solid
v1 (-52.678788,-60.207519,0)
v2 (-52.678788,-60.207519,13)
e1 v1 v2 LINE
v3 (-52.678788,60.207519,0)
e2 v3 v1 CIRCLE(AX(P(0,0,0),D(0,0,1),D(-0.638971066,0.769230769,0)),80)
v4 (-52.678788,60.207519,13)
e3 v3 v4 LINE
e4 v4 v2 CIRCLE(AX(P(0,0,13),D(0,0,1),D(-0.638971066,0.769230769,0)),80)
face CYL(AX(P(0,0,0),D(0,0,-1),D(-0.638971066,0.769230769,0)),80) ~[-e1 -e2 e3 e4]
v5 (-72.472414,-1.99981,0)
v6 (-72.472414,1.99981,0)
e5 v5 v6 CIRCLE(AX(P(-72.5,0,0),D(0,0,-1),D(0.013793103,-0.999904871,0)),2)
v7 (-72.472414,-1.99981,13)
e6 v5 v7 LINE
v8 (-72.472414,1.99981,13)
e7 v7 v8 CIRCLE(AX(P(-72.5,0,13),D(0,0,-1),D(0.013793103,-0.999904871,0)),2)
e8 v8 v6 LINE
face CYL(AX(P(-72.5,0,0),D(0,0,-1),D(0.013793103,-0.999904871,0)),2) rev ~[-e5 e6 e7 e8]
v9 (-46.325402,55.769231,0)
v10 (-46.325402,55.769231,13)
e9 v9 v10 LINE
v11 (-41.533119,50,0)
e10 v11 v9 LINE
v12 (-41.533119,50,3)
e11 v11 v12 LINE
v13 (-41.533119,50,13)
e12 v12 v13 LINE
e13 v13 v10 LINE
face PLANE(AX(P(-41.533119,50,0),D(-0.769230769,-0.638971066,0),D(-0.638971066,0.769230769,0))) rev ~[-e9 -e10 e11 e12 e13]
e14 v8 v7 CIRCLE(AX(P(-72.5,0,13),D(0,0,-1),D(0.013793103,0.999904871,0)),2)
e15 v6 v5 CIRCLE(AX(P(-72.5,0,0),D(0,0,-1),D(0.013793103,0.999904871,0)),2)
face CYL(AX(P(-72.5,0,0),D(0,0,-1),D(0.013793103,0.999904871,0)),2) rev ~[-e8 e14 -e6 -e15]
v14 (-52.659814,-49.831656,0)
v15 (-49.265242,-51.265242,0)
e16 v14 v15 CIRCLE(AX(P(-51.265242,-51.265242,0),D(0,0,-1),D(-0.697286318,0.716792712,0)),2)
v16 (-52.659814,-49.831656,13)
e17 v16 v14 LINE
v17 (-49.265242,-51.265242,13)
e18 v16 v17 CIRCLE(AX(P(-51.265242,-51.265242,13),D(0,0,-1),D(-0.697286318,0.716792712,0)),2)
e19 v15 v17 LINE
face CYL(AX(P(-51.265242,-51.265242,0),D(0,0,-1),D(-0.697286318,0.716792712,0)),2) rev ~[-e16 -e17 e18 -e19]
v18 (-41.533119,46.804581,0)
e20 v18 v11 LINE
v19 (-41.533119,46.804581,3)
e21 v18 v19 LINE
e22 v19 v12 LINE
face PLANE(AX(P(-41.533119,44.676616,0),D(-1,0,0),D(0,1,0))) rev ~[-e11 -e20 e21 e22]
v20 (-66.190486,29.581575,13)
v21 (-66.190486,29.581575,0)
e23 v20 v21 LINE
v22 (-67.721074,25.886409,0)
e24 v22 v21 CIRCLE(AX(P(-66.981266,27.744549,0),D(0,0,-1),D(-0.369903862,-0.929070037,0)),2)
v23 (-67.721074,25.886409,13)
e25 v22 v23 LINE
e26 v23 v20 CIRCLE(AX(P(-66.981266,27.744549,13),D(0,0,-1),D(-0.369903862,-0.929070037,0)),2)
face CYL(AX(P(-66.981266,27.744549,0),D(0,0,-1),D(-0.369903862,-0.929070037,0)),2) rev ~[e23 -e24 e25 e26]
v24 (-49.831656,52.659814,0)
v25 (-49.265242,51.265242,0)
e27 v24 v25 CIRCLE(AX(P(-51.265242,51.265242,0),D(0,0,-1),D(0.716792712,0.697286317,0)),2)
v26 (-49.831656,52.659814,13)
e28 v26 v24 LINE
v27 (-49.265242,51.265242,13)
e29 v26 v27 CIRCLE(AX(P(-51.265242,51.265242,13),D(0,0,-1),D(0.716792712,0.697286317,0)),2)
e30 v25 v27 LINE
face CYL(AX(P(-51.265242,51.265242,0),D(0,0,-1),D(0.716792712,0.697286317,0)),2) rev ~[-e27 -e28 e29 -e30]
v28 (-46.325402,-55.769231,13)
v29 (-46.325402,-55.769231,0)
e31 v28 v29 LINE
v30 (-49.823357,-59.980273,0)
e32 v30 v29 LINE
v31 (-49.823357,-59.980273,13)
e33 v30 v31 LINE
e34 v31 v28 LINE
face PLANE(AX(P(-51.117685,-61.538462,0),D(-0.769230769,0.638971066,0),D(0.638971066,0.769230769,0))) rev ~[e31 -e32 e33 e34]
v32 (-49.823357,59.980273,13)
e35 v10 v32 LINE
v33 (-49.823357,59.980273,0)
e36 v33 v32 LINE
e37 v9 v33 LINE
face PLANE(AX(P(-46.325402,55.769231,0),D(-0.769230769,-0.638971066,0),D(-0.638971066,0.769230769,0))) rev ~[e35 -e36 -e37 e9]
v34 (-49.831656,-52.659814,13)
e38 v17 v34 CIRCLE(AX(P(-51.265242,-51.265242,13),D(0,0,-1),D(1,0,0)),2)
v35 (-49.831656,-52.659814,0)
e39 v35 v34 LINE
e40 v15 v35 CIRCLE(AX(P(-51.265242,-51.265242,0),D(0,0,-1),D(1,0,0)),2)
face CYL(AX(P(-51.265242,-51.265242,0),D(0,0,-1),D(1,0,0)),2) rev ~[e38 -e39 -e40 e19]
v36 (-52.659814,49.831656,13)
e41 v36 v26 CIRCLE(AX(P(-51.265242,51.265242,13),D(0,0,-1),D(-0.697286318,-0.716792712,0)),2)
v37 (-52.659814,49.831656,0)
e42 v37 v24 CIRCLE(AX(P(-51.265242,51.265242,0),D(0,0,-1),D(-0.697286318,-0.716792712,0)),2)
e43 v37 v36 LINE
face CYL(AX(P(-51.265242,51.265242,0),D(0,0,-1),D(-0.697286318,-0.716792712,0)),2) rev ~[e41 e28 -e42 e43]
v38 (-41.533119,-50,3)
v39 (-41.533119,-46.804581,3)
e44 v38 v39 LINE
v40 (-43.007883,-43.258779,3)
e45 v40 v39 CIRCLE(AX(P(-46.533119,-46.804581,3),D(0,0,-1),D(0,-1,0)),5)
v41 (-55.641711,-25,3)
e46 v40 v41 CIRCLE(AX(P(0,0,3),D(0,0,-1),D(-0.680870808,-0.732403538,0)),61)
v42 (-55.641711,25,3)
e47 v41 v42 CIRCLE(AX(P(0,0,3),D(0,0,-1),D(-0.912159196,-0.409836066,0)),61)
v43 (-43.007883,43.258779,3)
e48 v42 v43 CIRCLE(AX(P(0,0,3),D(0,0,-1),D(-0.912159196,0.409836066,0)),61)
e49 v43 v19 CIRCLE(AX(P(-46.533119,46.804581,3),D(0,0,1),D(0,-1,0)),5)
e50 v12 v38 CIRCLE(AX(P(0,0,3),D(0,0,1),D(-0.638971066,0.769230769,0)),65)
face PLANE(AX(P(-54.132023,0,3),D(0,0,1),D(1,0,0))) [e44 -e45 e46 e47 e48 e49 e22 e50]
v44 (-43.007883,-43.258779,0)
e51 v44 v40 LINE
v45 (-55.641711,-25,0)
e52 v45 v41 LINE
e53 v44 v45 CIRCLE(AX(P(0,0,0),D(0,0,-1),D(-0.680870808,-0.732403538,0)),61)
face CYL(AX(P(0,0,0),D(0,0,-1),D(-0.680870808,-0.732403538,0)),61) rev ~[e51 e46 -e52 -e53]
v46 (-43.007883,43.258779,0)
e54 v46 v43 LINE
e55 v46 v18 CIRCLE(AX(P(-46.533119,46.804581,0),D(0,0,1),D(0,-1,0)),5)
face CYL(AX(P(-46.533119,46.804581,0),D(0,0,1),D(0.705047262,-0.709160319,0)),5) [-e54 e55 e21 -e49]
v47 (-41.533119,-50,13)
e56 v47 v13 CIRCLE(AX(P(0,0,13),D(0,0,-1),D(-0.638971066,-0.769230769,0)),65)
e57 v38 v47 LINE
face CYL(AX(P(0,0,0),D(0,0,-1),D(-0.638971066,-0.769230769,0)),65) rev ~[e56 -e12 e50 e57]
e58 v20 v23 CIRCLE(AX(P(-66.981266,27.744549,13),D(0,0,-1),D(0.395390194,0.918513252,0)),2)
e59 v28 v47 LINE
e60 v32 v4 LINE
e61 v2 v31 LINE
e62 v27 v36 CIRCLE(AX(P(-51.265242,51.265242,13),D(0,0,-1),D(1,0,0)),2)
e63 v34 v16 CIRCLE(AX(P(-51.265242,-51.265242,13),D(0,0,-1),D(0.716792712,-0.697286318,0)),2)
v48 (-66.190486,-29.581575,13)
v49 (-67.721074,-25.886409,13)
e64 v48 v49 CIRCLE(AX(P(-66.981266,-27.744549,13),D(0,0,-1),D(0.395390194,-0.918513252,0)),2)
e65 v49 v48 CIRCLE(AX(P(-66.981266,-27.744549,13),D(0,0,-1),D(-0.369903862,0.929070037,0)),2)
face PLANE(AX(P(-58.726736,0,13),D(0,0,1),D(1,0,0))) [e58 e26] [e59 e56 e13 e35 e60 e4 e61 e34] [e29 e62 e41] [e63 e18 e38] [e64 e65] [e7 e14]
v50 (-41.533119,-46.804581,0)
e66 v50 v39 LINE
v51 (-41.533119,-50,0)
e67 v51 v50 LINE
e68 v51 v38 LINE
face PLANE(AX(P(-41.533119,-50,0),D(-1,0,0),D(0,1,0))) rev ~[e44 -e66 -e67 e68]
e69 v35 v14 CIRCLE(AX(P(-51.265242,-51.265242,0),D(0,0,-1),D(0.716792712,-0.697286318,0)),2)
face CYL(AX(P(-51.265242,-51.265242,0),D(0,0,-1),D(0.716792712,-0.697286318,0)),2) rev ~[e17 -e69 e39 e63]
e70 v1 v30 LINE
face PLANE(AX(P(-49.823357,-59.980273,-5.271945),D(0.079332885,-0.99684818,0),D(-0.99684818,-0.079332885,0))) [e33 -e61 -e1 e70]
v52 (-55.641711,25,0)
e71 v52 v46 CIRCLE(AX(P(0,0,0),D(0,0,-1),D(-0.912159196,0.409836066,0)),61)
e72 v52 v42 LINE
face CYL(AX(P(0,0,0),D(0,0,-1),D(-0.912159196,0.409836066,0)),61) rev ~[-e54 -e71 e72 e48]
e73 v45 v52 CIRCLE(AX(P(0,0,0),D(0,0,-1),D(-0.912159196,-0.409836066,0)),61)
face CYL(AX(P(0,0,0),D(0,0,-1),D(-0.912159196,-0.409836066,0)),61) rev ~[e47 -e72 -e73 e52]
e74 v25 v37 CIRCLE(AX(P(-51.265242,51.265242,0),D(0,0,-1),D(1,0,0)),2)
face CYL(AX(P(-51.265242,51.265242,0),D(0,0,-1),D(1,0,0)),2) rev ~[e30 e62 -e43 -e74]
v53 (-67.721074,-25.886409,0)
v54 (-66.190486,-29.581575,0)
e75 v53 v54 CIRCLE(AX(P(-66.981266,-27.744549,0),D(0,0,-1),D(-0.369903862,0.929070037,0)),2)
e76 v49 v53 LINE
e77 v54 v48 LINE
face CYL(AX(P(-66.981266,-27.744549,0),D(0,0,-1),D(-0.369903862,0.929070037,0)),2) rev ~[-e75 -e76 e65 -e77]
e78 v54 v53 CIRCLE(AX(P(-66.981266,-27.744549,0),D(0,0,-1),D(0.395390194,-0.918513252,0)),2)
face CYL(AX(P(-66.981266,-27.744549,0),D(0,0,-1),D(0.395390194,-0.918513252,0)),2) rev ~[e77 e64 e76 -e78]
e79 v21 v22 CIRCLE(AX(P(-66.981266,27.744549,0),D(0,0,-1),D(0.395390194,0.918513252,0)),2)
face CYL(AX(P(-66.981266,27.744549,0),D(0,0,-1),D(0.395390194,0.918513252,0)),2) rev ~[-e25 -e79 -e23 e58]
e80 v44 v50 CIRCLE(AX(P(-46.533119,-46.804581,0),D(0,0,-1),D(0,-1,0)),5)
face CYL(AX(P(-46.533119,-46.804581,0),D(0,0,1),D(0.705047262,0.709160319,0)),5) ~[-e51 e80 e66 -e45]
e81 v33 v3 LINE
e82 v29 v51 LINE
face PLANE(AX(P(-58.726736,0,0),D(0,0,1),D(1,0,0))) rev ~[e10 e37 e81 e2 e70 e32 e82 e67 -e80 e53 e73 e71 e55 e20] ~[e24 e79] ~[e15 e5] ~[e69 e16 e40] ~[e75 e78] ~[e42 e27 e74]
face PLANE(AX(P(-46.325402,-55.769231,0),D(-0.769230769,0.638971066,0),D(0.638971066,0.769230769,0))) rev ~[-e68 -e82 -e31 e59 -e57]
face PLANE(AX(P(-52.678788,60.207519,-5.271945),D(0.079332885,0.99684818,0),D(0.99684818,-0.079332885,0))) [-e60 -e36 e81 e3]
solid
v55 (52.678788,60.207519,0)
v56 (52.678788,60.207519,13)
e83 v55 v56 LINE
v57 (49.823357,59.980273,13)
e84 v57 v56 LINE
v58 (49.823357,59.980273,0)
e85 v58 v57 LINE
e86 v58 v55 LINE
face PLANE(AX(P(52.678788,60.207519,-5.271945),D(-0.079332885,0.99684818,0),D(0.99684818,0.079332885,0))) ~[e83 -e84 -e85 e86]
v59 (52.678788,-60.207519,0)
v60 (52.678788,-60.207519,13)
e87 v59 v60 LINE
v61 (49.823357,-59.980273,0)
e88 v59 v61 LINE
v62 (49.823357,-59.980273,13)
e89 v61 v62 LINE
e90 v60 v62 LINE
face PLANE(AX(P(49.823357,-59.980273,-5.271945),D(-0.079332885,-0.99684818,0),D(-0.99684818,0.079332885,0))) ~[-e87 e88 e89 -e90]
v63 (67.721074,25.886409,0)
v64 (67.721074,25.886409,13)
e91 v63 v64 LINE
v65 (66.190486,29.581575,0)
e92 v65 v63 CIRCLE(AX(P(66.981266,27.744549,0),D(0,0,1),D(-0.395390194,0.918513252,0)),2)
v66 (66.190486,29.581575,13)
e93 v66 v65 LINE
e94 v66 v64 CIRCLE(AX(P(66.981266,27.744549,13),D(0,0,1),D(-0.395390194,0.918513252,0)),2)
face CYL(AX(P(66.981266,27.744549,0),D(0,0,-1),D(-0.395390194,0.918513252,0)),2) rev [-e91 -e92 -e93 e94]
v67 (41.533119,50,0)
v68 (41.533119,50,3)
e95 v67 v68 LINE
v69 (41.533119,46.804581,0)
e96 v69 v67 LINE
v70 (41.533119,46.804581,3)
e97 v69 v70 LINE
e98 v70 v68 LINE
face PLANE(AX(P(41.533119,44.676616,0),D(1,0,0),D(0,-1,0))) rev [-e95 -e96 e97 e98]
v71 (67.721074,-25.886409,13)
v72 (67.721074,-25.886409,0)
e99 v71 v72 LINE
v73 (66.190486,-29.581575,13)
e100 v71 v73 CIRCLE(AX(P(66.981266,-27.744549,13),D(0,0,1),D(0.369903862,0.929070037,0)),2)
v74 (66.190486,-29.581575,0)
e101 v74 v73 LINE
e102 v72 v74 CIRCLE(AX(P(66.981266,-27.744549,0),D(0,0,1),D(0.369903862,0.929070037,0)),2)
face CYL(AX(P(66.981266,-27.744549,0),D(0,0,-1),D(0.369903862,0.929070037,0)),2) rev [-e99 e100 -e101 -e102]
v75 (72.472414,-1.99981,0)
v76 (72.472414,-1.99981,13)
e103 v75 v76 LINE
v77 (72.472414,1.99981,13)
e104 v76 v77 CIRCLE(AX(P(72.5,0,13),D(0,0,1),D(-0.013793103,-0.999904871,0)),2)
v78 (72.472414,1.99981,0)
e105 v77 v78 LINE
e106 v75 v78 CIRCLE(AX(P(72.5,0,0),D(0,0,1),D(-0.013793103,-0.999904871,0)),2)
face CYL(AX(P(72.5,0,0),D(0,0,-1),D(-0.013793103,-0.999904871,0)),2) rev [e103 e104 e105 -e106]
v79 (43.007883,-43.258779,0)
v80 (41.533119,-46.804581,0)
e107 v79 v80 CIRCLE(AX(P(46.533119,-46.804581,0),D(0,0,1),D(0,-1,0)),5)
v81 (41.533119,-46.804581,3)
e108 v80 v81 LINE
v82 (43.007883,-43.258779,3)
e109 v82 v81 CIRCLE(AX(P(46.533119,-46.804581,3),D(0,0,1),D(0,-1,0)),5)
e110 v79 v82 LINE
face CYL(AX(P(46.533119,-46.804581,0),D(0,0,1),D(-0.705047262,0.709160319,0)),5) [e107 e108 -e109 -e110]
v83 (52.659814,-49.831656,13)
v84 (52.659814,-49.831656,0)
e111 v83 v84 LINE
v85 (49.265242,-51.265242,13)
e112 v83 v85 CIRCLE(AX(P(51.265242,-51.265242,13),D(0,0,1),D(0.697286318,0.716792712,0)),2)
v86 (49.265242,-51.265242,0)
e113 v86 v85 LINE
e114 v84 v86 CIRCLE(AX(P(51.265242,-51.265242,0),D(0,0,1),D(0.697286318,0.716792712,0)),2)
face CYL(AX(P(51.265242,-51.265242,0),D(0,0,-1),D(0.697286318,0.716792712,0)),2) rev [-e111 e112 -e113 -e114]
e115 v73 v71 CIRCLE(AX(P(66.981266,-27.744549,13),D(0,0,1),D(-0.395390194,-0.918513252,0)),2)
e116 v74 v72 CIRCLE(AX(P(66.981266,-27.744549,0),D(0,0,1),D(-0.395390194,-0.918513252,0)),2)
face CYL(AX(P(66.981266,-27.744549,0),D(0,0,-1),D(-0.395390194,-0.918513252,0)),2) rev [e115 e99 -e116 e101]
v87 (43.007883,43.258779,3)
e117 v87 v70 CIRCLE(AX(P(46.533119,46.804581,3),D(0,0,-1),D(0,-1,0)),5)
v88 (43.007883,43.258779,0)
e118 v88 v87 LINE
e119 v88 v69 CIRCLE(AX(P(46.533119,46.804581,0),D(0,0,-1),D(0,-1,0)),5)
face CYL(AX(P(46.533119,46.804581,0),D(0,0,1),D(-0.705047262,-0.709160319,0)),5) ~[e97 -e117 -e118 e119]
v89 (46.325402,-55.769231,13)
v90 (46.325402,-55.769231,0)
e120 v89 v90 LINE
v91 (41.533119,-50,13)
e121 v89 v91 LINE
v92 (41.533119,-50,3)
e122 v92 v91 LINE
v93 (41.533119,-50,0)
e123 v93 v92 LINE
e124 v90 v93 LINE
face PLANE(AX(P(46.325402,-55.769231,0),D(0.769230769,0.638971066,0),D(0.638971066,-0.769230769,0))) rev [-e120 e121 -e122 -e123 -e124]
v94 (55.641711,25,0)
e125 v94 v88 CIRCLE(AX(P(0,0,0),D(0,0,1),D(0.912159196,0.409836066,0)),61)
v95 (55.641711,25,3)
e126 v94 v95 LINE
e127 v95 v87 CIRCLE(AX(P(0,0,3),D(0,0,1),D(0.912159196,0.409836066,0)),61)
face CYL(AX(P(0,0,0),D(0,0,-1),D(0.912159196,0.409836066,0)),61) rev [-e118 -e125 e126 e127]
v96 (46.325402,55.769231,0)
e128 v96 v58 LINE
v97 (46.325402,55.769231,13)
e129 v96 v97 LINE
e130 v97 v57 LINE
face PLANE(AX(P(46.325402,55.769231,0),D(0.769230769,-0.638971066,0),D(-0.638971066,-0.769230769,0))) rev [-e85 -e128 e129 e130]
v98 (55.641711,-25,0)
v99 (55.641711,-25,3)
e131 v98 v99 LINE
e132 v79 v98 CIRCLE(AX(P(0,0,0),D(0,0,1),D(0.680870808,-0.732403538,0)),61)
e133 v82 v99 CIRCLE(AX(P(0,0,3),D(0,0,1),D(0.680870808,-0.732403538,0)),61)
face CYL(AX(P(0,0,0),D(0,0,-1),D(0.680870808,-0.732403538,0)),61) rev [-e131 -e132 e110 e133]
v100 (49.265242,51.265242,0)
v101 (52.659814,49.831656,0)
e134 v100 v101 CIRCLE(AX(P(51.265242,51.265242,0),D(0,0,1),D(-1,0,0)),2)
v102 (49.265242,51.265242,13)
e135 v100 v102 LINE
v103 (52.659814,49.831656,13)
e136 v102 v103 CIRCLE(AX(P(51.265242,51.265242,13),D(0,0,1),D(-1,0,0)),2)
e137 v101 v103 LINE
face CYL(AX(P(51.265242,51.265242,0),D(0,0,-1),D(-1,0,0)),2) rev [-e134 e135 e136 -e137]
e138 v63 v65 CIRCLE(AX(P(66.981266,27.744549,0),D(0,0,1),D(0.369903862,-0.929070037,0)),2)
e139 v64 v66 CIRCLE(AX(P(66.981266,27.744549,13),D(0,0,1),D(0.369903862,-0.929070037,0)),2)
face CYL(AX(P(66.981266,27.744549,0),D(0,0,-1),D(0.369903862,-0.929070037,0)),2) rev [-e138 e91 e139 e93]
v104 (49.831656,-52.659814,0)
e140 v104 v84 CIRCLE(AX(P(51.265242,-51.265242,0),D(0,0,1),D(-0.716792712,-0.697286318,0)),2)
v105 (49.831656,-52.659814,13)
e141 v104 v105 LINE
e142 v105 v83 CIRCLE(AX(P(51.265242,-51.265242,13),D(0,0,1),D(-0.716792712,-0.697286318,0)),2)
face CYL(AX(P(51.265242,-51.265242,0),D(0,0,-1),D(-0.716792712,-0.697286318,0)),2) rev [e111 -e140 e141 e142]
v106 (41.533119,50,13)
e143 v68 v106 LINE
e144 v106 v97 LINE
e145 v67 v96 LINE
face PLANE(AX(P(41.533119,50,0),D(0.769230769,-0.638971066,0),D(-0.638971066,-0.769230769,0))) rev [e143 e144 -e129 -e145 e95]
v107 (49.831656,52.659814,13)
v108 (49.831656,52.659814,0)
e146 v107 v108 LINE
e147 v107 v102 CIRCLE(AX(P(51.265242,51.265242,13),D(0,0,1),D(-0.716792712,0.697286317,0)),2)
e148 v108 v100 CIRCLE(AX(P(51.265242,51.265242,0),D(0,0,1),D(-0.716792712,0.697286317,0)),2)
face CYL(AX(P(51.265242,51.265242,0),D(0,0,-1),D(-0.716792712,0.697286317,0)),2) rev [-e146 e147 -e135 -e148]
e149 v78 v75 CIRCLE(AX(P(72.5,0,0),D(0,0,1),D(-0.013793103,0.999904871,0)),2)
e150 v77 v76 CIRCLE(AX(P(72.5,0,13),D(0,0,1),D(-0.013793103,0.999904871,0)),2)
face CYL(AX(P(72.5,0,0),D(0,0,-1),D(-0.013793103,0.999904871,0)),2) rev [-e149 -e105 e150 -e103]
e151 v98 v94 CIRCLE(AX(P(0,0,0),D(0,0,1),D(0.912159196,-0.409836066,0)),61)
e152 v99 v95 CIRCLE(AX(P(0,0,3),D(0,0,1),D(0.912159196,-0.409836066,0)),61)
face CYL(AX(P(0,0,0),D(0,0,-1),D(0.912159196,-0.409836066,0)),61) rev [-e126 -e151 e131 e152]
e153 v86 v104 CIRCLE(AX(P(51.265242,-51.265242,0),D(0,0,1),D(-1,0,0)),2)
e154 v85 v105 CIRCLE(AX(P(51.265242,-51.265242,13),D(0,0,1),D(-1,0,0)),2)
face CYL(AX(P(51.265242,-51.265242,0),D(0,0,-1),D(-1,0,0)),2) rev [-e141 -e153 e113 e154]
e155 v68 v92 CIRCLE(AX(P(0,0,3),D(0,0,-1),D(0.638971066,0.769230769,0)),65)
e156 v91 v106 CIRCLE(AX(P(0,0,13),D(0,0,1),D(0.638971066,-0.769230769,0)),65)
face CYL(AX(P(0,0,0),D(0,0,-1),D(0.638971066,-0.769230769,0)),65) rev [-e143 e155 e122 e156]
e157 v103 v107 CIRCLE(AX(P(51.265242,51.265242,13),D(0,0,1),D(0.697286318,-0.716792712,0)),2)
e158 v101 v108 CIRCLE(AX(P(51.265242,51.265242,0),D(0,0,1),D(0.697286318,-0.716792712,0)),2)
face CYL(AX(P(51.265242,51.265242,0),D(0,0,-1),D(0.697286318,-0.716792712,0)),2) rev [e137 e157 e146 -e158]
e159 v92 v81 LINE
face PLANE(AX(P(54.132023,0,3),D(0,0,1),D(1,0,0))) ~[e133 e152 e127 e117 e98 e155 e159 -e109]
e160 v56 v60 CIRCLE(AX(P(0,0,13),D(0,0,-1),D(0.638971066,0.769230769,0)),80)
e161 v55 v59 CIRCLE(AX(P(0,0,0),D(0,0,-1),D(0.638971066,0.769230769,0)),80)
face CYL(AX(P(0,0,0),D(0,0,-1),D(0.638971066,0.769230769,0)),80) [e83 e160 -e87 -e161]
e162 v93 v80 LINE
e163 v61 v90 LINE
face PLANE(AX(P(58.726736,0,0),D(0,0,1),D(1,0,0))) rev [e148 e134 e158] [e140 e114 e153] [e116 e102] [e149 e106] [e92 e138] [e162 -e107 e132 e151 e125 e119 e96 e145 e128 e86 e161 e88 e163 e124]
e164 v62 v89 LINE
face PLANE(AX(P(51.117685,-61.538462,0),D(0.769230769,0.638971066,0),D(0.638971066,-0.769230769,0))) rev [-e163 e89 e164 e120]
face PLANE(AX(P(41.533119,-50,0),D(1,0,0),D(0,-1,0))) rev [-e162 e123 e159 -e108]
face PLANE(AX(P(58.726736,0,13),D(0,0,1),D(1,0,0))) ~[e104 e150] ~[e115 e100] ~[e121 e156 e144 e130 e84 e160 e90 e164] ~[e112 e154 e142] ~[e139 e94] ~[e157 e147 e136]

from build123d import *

# Parameters (mm, degrees)
F1_DEPTH    = 3
F2_DEPTH    = 13
F3_R        = 5
F4_T1_DEPTH = 23.5438904605


# Not quite as in the source:
# - a fillet or chamfer that OpenCascade refuses, or shapes differently, is made with other operations: its cross-section is extruded or revolved along the edge and cut away or added


with BuildPart() as f1:
    # F0 (on Top) → F1 (new body)
    with BuildSketch(Plane.XY):
        with BuildLine():
            ThreePointArc((-55.641710973, -25), (-61, 0), (-55.641710973, 25))
            ThreePointArc((-55.641710973, 25), (-49.5734728737, 35.5453342541), (-41.5331193146, 44.6766158074))
            Line((-41.5331193146, 44.6766158074), (-41.5331193146, 50))
            ThreePointArc((-41.5331193146, 50), (-65, 0), (-41.5331193146, -50))
            Line((-41.5331193146, -50), (-41.5331193146, -44.6766158074))
            ThreePointArc((-41.5331193146, -44.6766158074), (-49.5734728737, -35.5453342541), (-55.641710973, -25))
        make_face()
    extrude(amount=F1_DEPTH)



with BuildPart() as f1b:
    # F0 (on Top) → F1, piece 2 (new body)
    with BuildSketch(Plane.XY):
        with BuildLine():
            ThreePointArc((-49.8316562129, 52.6598142712), (-48.1036598795, 54.2428604168), (-46.3254023124, 55.7692307692))
            Line((-46.3254023124, 55.7692307692), (-51.1176853103, 61.5384615385))
            ThreePointArc((-51.1176853103, 61.5384615385), (-80, 0), (-51.1176853103, -61.5384615385))
            Line((-51.1176853103, -61.5384615385), (-46.3254023124, -55.7692307692))
            ThreePointArc((-46.3254023124, -55.7692307692), (-48.1036598795, -54.2428604168), (-49.8316562129, -52.6598142712))
            ThreePointArc((-49.8316562129, -52.6598142712), (-52.6794551984, -52.6794551984), (-52.6598142712, -49.8316562129))
            ThreePointArc((-52.6598142712, -49.8316562129), (-60.2815468919, -40.2788418939), (-66.1904857193, -29.581575351))
            ThreePointArc((-66.1904857193, -29.581575351), (-68.8290251721, -28.5099157112), (-67.721073831, -25.8864087733))
            ThreePointArc((-67.721073831, -25.8864087733), (-71.1069328292, -14.1440483462), (-72.4724137931, -1.9998097412))
            ThreePointArc((-72.4724137931, -1.9998097412), (-74.5, 0), (-72.4724137931, 1.9998097412))
            ThreePointArc((-72.4724137931, 1.9998097412), (-71.1069328292, 14.1440483462), (-67.721073831, 25.8864087733))
            ThreePointArc((-67.721073831, 25.8864087733), (-68.8290251721, 28.5099157112), (-66.1904857193, 29.581575351))
            ThreePointArc((-66.1904857193, 29.581575351), (-60.2815468919, 40.2788418939), (-52.6598142712, 49.8316562129))
            ThreePointArc((-52.6598142712, 49.8316562129), (-52.6794551984, 52.6794551984), (-49.8316562129, 52.6598142712))
        make_face()
    extrude(amount=F1_DEPTH)


with BuildPart() as f1_1:
    add(f1.part)

    add(f1b.part)  # F2 merges F1b
    # F0 (on Top) → F2 (join)
    with BuildSketch(Plane.XY):
        with BuildLine():
            ThreePointArc((-41.5331193146, -50), (-65, 0), (-41.5331193146, 50))
            Line((-41.5331193146, 50), (-46.3254023124, 55.7692307692))
            ThreePointArc((-46.3254023124, 55.7692307692), (-48.1036598795, 54.2428604168), (-49.8316562129, 52.6598142712))
            ThreePointArc((-49.8316562129, 52.6598142712), (-49.4122479979, 52.0178468293), (-49.265241636, 51.265241636))
            ThreePointArc((-49.265241636, 51.265241636), (-50.4871495047, 49.4228050333), (-52.6598142712, 49.8316562129))
            ThreePointArc((-52.6598142712, 49.8316562129), (-60.2815468919, 40.2788418939), (-66.1904857193, 29.581575351))
            ThreePointArc((-66.1904857193, 29.581575351), (-65.3107032116, 28.8441940675), (-64.9812661071, 27.7445488465))
            ThreePointArc((-64.9812661071, 27.7445488465), (-65.8586832477, 26.0893123909), (-67.721073831, 25.8864087733))
            ThreePointArc((-67.721073831, 25.8864087733), (-71.1069328292, 14.1440483462), (-72.4724137931, 1.9998097412))
            ThreePointArc((-72.4724137931, 1.9998097412), (-71.0760666424, 1.4044264997), (-70.5, 0))
            ThreePointArc((-70.5, 0), (-71.0760666424, -1.4044264997), (-72.4724137931, -1.9998097412))
            ThreePointArc((-72.4724137931, -1.9998097412), (-71.1069328292, -14.1440483462), (-67.721073831, -25.8864087733))
            ThreePointArc((-67.721073831, -25.8864087733), (-65.8586832477, -26.0893123909), (-64.9812661071, -27.7445488465))
            ThreePointArc((-64.9812661071, -27.7445488465), (-65.3107032116, -28.8441940675), (-66.1904857193, -29.581575351))
            ThreePointArc((-66.1904857193, -29.581575351), (-60.2815468919, -40.2788418939), (-52.6598142712, -49.8316562129))
            ThreePointArc((-52.6598142712, -49.8316562129), (-50.4871495047, -49.4228050333), (-49.265241636, -51.265241636))
            ThreePointArc((-49.265241636, -51.265241636), (-49.4122479979, -52.0178468293), (-49.8316562129, -52.6598142712))
            ThreePointArc((-49.8316562129, -52.6598142712), (-48.1036598795, -54.2428604168), (-46.3254023124, -55.7692307692))
            Line((-46.3254023124, -55.7692307692), (-41.5331193146, -50))
        make_face()
        with BuildLine():
            ThreePointArc((-49.8316562129, 52.6598142712), (-48.1036598795, 54.2428604168), (-46.3254023124, 55.7692307692))
            Line((-46.3254023124, 55.7692307692), (-51.1176853103, 61.5384615385))
            ThreePointArc((-51.1176853103, 61.5384615385), (-80, 0), (-51.1176853103, -61.5384615385))
            Line((-51.1176853103, -61.5384615385), (-46.3254023124, -55.7692307692))
            ThreePointArc((-46.3254023124, -55.7692307692), (-48.1036598795, -54.2428604168), (-49.8316562129, -52.6598142712))
            ThreePointArc((-49.8316562129, -52.6598142712), (-52.6794551984, -52.6794551984), (-52.6598142712, -49.8316562129))
            ThreePointArc((-52.6598142712, -49.8316562129), (-60.2815468919, -40.2788418939), (-66.1904857193, -29.581575351))
            ThreePointArc((-66.1904857193, -29.581575351), (-68.8290251721, -28.5099157112), (-67.721073831, -25.8864087733))
            ThreePointArc((-67.721073831, -25.8864087733), (-71.1069328292, -14.1440483462), (-72.4724137931, -1.9998097412))
            ThreePointArc((-72.4724137931, -1.9998097412), (-74.5, 0), (-72.4724137931, 1.9998097412))
            ThreePointArc((-72.4724137931, 1.9998097412), (-71.1069328292, 14.1440483462), (-67.721073831, 25.8864087733))
            ThreePointArc((-67.721073831, 25.8864087733), (-68.8290251721, 28.5099157112), (-66.1904857193, 29.581575351))
            ThreePointArc((-66.1904857193, 29.581575351), (-60.2815468919, 40.2788418939), (-52.6598142712, 49.8316562129))
            ThreePointArc((-52.6598142712, 49.8316562129), (-52.6794551984, 52.6794551984), (-49.8316562129, 52.6598142712))
        make_face()
    extrude(amount=F2_DEPTH)

    # F3
    f3_edges = [f1_1.edges().sort_by_distance(p)[0] for p in [
        (-41.533119, 44.676616, 1.5),
        (-41.533119, -44.676616, 1.5),
    ]]
    fillet(f3_edges, radius=F3_R)

    # F4: chamfer of 2 on 2 edges, made by hand

    # F4_s2 → F4_t1 (cut)
    with BuildSketch(Plane.XY.offset(-5.2719452303)):
        with BuildLine():
            Line((-52.6787878448, 60.2075187265), (-49.8233566102, 59.9802728911))
            Line((-49.8233566102, 59.9802728911), (-51.1176853103, 61.5384615385))
            ThreePointArc((-51.1176853103, 61.5384615385), (-51.9240174848, 60.8596451538), (-52.6787878448, 60.2075187265))
        make_face()
        with BuildLine():
            Line((-49.8233566102, -59.9802728911), (-52.6787878448, -60.2075187265))
            ThreePointArc((-52.6787878448, -60.2075187265), (-51.9240174848, -60.8596451538), (-51.1176853103, -61.5384615385))
            Line((-51.1176853103, -61.5384615385), (-49.8233566102, -59.9802728911))
        make_face()
    extrude(amount=F4_T1_DEPTH, mode=Mode.SUBTRACT)


with BuildPart() as f5_1:
    # F5: instance of F1
    add(f1_1.part.mirror(Plane.YZ))


solid = Compound([f1_1.part, f5_1.part])
